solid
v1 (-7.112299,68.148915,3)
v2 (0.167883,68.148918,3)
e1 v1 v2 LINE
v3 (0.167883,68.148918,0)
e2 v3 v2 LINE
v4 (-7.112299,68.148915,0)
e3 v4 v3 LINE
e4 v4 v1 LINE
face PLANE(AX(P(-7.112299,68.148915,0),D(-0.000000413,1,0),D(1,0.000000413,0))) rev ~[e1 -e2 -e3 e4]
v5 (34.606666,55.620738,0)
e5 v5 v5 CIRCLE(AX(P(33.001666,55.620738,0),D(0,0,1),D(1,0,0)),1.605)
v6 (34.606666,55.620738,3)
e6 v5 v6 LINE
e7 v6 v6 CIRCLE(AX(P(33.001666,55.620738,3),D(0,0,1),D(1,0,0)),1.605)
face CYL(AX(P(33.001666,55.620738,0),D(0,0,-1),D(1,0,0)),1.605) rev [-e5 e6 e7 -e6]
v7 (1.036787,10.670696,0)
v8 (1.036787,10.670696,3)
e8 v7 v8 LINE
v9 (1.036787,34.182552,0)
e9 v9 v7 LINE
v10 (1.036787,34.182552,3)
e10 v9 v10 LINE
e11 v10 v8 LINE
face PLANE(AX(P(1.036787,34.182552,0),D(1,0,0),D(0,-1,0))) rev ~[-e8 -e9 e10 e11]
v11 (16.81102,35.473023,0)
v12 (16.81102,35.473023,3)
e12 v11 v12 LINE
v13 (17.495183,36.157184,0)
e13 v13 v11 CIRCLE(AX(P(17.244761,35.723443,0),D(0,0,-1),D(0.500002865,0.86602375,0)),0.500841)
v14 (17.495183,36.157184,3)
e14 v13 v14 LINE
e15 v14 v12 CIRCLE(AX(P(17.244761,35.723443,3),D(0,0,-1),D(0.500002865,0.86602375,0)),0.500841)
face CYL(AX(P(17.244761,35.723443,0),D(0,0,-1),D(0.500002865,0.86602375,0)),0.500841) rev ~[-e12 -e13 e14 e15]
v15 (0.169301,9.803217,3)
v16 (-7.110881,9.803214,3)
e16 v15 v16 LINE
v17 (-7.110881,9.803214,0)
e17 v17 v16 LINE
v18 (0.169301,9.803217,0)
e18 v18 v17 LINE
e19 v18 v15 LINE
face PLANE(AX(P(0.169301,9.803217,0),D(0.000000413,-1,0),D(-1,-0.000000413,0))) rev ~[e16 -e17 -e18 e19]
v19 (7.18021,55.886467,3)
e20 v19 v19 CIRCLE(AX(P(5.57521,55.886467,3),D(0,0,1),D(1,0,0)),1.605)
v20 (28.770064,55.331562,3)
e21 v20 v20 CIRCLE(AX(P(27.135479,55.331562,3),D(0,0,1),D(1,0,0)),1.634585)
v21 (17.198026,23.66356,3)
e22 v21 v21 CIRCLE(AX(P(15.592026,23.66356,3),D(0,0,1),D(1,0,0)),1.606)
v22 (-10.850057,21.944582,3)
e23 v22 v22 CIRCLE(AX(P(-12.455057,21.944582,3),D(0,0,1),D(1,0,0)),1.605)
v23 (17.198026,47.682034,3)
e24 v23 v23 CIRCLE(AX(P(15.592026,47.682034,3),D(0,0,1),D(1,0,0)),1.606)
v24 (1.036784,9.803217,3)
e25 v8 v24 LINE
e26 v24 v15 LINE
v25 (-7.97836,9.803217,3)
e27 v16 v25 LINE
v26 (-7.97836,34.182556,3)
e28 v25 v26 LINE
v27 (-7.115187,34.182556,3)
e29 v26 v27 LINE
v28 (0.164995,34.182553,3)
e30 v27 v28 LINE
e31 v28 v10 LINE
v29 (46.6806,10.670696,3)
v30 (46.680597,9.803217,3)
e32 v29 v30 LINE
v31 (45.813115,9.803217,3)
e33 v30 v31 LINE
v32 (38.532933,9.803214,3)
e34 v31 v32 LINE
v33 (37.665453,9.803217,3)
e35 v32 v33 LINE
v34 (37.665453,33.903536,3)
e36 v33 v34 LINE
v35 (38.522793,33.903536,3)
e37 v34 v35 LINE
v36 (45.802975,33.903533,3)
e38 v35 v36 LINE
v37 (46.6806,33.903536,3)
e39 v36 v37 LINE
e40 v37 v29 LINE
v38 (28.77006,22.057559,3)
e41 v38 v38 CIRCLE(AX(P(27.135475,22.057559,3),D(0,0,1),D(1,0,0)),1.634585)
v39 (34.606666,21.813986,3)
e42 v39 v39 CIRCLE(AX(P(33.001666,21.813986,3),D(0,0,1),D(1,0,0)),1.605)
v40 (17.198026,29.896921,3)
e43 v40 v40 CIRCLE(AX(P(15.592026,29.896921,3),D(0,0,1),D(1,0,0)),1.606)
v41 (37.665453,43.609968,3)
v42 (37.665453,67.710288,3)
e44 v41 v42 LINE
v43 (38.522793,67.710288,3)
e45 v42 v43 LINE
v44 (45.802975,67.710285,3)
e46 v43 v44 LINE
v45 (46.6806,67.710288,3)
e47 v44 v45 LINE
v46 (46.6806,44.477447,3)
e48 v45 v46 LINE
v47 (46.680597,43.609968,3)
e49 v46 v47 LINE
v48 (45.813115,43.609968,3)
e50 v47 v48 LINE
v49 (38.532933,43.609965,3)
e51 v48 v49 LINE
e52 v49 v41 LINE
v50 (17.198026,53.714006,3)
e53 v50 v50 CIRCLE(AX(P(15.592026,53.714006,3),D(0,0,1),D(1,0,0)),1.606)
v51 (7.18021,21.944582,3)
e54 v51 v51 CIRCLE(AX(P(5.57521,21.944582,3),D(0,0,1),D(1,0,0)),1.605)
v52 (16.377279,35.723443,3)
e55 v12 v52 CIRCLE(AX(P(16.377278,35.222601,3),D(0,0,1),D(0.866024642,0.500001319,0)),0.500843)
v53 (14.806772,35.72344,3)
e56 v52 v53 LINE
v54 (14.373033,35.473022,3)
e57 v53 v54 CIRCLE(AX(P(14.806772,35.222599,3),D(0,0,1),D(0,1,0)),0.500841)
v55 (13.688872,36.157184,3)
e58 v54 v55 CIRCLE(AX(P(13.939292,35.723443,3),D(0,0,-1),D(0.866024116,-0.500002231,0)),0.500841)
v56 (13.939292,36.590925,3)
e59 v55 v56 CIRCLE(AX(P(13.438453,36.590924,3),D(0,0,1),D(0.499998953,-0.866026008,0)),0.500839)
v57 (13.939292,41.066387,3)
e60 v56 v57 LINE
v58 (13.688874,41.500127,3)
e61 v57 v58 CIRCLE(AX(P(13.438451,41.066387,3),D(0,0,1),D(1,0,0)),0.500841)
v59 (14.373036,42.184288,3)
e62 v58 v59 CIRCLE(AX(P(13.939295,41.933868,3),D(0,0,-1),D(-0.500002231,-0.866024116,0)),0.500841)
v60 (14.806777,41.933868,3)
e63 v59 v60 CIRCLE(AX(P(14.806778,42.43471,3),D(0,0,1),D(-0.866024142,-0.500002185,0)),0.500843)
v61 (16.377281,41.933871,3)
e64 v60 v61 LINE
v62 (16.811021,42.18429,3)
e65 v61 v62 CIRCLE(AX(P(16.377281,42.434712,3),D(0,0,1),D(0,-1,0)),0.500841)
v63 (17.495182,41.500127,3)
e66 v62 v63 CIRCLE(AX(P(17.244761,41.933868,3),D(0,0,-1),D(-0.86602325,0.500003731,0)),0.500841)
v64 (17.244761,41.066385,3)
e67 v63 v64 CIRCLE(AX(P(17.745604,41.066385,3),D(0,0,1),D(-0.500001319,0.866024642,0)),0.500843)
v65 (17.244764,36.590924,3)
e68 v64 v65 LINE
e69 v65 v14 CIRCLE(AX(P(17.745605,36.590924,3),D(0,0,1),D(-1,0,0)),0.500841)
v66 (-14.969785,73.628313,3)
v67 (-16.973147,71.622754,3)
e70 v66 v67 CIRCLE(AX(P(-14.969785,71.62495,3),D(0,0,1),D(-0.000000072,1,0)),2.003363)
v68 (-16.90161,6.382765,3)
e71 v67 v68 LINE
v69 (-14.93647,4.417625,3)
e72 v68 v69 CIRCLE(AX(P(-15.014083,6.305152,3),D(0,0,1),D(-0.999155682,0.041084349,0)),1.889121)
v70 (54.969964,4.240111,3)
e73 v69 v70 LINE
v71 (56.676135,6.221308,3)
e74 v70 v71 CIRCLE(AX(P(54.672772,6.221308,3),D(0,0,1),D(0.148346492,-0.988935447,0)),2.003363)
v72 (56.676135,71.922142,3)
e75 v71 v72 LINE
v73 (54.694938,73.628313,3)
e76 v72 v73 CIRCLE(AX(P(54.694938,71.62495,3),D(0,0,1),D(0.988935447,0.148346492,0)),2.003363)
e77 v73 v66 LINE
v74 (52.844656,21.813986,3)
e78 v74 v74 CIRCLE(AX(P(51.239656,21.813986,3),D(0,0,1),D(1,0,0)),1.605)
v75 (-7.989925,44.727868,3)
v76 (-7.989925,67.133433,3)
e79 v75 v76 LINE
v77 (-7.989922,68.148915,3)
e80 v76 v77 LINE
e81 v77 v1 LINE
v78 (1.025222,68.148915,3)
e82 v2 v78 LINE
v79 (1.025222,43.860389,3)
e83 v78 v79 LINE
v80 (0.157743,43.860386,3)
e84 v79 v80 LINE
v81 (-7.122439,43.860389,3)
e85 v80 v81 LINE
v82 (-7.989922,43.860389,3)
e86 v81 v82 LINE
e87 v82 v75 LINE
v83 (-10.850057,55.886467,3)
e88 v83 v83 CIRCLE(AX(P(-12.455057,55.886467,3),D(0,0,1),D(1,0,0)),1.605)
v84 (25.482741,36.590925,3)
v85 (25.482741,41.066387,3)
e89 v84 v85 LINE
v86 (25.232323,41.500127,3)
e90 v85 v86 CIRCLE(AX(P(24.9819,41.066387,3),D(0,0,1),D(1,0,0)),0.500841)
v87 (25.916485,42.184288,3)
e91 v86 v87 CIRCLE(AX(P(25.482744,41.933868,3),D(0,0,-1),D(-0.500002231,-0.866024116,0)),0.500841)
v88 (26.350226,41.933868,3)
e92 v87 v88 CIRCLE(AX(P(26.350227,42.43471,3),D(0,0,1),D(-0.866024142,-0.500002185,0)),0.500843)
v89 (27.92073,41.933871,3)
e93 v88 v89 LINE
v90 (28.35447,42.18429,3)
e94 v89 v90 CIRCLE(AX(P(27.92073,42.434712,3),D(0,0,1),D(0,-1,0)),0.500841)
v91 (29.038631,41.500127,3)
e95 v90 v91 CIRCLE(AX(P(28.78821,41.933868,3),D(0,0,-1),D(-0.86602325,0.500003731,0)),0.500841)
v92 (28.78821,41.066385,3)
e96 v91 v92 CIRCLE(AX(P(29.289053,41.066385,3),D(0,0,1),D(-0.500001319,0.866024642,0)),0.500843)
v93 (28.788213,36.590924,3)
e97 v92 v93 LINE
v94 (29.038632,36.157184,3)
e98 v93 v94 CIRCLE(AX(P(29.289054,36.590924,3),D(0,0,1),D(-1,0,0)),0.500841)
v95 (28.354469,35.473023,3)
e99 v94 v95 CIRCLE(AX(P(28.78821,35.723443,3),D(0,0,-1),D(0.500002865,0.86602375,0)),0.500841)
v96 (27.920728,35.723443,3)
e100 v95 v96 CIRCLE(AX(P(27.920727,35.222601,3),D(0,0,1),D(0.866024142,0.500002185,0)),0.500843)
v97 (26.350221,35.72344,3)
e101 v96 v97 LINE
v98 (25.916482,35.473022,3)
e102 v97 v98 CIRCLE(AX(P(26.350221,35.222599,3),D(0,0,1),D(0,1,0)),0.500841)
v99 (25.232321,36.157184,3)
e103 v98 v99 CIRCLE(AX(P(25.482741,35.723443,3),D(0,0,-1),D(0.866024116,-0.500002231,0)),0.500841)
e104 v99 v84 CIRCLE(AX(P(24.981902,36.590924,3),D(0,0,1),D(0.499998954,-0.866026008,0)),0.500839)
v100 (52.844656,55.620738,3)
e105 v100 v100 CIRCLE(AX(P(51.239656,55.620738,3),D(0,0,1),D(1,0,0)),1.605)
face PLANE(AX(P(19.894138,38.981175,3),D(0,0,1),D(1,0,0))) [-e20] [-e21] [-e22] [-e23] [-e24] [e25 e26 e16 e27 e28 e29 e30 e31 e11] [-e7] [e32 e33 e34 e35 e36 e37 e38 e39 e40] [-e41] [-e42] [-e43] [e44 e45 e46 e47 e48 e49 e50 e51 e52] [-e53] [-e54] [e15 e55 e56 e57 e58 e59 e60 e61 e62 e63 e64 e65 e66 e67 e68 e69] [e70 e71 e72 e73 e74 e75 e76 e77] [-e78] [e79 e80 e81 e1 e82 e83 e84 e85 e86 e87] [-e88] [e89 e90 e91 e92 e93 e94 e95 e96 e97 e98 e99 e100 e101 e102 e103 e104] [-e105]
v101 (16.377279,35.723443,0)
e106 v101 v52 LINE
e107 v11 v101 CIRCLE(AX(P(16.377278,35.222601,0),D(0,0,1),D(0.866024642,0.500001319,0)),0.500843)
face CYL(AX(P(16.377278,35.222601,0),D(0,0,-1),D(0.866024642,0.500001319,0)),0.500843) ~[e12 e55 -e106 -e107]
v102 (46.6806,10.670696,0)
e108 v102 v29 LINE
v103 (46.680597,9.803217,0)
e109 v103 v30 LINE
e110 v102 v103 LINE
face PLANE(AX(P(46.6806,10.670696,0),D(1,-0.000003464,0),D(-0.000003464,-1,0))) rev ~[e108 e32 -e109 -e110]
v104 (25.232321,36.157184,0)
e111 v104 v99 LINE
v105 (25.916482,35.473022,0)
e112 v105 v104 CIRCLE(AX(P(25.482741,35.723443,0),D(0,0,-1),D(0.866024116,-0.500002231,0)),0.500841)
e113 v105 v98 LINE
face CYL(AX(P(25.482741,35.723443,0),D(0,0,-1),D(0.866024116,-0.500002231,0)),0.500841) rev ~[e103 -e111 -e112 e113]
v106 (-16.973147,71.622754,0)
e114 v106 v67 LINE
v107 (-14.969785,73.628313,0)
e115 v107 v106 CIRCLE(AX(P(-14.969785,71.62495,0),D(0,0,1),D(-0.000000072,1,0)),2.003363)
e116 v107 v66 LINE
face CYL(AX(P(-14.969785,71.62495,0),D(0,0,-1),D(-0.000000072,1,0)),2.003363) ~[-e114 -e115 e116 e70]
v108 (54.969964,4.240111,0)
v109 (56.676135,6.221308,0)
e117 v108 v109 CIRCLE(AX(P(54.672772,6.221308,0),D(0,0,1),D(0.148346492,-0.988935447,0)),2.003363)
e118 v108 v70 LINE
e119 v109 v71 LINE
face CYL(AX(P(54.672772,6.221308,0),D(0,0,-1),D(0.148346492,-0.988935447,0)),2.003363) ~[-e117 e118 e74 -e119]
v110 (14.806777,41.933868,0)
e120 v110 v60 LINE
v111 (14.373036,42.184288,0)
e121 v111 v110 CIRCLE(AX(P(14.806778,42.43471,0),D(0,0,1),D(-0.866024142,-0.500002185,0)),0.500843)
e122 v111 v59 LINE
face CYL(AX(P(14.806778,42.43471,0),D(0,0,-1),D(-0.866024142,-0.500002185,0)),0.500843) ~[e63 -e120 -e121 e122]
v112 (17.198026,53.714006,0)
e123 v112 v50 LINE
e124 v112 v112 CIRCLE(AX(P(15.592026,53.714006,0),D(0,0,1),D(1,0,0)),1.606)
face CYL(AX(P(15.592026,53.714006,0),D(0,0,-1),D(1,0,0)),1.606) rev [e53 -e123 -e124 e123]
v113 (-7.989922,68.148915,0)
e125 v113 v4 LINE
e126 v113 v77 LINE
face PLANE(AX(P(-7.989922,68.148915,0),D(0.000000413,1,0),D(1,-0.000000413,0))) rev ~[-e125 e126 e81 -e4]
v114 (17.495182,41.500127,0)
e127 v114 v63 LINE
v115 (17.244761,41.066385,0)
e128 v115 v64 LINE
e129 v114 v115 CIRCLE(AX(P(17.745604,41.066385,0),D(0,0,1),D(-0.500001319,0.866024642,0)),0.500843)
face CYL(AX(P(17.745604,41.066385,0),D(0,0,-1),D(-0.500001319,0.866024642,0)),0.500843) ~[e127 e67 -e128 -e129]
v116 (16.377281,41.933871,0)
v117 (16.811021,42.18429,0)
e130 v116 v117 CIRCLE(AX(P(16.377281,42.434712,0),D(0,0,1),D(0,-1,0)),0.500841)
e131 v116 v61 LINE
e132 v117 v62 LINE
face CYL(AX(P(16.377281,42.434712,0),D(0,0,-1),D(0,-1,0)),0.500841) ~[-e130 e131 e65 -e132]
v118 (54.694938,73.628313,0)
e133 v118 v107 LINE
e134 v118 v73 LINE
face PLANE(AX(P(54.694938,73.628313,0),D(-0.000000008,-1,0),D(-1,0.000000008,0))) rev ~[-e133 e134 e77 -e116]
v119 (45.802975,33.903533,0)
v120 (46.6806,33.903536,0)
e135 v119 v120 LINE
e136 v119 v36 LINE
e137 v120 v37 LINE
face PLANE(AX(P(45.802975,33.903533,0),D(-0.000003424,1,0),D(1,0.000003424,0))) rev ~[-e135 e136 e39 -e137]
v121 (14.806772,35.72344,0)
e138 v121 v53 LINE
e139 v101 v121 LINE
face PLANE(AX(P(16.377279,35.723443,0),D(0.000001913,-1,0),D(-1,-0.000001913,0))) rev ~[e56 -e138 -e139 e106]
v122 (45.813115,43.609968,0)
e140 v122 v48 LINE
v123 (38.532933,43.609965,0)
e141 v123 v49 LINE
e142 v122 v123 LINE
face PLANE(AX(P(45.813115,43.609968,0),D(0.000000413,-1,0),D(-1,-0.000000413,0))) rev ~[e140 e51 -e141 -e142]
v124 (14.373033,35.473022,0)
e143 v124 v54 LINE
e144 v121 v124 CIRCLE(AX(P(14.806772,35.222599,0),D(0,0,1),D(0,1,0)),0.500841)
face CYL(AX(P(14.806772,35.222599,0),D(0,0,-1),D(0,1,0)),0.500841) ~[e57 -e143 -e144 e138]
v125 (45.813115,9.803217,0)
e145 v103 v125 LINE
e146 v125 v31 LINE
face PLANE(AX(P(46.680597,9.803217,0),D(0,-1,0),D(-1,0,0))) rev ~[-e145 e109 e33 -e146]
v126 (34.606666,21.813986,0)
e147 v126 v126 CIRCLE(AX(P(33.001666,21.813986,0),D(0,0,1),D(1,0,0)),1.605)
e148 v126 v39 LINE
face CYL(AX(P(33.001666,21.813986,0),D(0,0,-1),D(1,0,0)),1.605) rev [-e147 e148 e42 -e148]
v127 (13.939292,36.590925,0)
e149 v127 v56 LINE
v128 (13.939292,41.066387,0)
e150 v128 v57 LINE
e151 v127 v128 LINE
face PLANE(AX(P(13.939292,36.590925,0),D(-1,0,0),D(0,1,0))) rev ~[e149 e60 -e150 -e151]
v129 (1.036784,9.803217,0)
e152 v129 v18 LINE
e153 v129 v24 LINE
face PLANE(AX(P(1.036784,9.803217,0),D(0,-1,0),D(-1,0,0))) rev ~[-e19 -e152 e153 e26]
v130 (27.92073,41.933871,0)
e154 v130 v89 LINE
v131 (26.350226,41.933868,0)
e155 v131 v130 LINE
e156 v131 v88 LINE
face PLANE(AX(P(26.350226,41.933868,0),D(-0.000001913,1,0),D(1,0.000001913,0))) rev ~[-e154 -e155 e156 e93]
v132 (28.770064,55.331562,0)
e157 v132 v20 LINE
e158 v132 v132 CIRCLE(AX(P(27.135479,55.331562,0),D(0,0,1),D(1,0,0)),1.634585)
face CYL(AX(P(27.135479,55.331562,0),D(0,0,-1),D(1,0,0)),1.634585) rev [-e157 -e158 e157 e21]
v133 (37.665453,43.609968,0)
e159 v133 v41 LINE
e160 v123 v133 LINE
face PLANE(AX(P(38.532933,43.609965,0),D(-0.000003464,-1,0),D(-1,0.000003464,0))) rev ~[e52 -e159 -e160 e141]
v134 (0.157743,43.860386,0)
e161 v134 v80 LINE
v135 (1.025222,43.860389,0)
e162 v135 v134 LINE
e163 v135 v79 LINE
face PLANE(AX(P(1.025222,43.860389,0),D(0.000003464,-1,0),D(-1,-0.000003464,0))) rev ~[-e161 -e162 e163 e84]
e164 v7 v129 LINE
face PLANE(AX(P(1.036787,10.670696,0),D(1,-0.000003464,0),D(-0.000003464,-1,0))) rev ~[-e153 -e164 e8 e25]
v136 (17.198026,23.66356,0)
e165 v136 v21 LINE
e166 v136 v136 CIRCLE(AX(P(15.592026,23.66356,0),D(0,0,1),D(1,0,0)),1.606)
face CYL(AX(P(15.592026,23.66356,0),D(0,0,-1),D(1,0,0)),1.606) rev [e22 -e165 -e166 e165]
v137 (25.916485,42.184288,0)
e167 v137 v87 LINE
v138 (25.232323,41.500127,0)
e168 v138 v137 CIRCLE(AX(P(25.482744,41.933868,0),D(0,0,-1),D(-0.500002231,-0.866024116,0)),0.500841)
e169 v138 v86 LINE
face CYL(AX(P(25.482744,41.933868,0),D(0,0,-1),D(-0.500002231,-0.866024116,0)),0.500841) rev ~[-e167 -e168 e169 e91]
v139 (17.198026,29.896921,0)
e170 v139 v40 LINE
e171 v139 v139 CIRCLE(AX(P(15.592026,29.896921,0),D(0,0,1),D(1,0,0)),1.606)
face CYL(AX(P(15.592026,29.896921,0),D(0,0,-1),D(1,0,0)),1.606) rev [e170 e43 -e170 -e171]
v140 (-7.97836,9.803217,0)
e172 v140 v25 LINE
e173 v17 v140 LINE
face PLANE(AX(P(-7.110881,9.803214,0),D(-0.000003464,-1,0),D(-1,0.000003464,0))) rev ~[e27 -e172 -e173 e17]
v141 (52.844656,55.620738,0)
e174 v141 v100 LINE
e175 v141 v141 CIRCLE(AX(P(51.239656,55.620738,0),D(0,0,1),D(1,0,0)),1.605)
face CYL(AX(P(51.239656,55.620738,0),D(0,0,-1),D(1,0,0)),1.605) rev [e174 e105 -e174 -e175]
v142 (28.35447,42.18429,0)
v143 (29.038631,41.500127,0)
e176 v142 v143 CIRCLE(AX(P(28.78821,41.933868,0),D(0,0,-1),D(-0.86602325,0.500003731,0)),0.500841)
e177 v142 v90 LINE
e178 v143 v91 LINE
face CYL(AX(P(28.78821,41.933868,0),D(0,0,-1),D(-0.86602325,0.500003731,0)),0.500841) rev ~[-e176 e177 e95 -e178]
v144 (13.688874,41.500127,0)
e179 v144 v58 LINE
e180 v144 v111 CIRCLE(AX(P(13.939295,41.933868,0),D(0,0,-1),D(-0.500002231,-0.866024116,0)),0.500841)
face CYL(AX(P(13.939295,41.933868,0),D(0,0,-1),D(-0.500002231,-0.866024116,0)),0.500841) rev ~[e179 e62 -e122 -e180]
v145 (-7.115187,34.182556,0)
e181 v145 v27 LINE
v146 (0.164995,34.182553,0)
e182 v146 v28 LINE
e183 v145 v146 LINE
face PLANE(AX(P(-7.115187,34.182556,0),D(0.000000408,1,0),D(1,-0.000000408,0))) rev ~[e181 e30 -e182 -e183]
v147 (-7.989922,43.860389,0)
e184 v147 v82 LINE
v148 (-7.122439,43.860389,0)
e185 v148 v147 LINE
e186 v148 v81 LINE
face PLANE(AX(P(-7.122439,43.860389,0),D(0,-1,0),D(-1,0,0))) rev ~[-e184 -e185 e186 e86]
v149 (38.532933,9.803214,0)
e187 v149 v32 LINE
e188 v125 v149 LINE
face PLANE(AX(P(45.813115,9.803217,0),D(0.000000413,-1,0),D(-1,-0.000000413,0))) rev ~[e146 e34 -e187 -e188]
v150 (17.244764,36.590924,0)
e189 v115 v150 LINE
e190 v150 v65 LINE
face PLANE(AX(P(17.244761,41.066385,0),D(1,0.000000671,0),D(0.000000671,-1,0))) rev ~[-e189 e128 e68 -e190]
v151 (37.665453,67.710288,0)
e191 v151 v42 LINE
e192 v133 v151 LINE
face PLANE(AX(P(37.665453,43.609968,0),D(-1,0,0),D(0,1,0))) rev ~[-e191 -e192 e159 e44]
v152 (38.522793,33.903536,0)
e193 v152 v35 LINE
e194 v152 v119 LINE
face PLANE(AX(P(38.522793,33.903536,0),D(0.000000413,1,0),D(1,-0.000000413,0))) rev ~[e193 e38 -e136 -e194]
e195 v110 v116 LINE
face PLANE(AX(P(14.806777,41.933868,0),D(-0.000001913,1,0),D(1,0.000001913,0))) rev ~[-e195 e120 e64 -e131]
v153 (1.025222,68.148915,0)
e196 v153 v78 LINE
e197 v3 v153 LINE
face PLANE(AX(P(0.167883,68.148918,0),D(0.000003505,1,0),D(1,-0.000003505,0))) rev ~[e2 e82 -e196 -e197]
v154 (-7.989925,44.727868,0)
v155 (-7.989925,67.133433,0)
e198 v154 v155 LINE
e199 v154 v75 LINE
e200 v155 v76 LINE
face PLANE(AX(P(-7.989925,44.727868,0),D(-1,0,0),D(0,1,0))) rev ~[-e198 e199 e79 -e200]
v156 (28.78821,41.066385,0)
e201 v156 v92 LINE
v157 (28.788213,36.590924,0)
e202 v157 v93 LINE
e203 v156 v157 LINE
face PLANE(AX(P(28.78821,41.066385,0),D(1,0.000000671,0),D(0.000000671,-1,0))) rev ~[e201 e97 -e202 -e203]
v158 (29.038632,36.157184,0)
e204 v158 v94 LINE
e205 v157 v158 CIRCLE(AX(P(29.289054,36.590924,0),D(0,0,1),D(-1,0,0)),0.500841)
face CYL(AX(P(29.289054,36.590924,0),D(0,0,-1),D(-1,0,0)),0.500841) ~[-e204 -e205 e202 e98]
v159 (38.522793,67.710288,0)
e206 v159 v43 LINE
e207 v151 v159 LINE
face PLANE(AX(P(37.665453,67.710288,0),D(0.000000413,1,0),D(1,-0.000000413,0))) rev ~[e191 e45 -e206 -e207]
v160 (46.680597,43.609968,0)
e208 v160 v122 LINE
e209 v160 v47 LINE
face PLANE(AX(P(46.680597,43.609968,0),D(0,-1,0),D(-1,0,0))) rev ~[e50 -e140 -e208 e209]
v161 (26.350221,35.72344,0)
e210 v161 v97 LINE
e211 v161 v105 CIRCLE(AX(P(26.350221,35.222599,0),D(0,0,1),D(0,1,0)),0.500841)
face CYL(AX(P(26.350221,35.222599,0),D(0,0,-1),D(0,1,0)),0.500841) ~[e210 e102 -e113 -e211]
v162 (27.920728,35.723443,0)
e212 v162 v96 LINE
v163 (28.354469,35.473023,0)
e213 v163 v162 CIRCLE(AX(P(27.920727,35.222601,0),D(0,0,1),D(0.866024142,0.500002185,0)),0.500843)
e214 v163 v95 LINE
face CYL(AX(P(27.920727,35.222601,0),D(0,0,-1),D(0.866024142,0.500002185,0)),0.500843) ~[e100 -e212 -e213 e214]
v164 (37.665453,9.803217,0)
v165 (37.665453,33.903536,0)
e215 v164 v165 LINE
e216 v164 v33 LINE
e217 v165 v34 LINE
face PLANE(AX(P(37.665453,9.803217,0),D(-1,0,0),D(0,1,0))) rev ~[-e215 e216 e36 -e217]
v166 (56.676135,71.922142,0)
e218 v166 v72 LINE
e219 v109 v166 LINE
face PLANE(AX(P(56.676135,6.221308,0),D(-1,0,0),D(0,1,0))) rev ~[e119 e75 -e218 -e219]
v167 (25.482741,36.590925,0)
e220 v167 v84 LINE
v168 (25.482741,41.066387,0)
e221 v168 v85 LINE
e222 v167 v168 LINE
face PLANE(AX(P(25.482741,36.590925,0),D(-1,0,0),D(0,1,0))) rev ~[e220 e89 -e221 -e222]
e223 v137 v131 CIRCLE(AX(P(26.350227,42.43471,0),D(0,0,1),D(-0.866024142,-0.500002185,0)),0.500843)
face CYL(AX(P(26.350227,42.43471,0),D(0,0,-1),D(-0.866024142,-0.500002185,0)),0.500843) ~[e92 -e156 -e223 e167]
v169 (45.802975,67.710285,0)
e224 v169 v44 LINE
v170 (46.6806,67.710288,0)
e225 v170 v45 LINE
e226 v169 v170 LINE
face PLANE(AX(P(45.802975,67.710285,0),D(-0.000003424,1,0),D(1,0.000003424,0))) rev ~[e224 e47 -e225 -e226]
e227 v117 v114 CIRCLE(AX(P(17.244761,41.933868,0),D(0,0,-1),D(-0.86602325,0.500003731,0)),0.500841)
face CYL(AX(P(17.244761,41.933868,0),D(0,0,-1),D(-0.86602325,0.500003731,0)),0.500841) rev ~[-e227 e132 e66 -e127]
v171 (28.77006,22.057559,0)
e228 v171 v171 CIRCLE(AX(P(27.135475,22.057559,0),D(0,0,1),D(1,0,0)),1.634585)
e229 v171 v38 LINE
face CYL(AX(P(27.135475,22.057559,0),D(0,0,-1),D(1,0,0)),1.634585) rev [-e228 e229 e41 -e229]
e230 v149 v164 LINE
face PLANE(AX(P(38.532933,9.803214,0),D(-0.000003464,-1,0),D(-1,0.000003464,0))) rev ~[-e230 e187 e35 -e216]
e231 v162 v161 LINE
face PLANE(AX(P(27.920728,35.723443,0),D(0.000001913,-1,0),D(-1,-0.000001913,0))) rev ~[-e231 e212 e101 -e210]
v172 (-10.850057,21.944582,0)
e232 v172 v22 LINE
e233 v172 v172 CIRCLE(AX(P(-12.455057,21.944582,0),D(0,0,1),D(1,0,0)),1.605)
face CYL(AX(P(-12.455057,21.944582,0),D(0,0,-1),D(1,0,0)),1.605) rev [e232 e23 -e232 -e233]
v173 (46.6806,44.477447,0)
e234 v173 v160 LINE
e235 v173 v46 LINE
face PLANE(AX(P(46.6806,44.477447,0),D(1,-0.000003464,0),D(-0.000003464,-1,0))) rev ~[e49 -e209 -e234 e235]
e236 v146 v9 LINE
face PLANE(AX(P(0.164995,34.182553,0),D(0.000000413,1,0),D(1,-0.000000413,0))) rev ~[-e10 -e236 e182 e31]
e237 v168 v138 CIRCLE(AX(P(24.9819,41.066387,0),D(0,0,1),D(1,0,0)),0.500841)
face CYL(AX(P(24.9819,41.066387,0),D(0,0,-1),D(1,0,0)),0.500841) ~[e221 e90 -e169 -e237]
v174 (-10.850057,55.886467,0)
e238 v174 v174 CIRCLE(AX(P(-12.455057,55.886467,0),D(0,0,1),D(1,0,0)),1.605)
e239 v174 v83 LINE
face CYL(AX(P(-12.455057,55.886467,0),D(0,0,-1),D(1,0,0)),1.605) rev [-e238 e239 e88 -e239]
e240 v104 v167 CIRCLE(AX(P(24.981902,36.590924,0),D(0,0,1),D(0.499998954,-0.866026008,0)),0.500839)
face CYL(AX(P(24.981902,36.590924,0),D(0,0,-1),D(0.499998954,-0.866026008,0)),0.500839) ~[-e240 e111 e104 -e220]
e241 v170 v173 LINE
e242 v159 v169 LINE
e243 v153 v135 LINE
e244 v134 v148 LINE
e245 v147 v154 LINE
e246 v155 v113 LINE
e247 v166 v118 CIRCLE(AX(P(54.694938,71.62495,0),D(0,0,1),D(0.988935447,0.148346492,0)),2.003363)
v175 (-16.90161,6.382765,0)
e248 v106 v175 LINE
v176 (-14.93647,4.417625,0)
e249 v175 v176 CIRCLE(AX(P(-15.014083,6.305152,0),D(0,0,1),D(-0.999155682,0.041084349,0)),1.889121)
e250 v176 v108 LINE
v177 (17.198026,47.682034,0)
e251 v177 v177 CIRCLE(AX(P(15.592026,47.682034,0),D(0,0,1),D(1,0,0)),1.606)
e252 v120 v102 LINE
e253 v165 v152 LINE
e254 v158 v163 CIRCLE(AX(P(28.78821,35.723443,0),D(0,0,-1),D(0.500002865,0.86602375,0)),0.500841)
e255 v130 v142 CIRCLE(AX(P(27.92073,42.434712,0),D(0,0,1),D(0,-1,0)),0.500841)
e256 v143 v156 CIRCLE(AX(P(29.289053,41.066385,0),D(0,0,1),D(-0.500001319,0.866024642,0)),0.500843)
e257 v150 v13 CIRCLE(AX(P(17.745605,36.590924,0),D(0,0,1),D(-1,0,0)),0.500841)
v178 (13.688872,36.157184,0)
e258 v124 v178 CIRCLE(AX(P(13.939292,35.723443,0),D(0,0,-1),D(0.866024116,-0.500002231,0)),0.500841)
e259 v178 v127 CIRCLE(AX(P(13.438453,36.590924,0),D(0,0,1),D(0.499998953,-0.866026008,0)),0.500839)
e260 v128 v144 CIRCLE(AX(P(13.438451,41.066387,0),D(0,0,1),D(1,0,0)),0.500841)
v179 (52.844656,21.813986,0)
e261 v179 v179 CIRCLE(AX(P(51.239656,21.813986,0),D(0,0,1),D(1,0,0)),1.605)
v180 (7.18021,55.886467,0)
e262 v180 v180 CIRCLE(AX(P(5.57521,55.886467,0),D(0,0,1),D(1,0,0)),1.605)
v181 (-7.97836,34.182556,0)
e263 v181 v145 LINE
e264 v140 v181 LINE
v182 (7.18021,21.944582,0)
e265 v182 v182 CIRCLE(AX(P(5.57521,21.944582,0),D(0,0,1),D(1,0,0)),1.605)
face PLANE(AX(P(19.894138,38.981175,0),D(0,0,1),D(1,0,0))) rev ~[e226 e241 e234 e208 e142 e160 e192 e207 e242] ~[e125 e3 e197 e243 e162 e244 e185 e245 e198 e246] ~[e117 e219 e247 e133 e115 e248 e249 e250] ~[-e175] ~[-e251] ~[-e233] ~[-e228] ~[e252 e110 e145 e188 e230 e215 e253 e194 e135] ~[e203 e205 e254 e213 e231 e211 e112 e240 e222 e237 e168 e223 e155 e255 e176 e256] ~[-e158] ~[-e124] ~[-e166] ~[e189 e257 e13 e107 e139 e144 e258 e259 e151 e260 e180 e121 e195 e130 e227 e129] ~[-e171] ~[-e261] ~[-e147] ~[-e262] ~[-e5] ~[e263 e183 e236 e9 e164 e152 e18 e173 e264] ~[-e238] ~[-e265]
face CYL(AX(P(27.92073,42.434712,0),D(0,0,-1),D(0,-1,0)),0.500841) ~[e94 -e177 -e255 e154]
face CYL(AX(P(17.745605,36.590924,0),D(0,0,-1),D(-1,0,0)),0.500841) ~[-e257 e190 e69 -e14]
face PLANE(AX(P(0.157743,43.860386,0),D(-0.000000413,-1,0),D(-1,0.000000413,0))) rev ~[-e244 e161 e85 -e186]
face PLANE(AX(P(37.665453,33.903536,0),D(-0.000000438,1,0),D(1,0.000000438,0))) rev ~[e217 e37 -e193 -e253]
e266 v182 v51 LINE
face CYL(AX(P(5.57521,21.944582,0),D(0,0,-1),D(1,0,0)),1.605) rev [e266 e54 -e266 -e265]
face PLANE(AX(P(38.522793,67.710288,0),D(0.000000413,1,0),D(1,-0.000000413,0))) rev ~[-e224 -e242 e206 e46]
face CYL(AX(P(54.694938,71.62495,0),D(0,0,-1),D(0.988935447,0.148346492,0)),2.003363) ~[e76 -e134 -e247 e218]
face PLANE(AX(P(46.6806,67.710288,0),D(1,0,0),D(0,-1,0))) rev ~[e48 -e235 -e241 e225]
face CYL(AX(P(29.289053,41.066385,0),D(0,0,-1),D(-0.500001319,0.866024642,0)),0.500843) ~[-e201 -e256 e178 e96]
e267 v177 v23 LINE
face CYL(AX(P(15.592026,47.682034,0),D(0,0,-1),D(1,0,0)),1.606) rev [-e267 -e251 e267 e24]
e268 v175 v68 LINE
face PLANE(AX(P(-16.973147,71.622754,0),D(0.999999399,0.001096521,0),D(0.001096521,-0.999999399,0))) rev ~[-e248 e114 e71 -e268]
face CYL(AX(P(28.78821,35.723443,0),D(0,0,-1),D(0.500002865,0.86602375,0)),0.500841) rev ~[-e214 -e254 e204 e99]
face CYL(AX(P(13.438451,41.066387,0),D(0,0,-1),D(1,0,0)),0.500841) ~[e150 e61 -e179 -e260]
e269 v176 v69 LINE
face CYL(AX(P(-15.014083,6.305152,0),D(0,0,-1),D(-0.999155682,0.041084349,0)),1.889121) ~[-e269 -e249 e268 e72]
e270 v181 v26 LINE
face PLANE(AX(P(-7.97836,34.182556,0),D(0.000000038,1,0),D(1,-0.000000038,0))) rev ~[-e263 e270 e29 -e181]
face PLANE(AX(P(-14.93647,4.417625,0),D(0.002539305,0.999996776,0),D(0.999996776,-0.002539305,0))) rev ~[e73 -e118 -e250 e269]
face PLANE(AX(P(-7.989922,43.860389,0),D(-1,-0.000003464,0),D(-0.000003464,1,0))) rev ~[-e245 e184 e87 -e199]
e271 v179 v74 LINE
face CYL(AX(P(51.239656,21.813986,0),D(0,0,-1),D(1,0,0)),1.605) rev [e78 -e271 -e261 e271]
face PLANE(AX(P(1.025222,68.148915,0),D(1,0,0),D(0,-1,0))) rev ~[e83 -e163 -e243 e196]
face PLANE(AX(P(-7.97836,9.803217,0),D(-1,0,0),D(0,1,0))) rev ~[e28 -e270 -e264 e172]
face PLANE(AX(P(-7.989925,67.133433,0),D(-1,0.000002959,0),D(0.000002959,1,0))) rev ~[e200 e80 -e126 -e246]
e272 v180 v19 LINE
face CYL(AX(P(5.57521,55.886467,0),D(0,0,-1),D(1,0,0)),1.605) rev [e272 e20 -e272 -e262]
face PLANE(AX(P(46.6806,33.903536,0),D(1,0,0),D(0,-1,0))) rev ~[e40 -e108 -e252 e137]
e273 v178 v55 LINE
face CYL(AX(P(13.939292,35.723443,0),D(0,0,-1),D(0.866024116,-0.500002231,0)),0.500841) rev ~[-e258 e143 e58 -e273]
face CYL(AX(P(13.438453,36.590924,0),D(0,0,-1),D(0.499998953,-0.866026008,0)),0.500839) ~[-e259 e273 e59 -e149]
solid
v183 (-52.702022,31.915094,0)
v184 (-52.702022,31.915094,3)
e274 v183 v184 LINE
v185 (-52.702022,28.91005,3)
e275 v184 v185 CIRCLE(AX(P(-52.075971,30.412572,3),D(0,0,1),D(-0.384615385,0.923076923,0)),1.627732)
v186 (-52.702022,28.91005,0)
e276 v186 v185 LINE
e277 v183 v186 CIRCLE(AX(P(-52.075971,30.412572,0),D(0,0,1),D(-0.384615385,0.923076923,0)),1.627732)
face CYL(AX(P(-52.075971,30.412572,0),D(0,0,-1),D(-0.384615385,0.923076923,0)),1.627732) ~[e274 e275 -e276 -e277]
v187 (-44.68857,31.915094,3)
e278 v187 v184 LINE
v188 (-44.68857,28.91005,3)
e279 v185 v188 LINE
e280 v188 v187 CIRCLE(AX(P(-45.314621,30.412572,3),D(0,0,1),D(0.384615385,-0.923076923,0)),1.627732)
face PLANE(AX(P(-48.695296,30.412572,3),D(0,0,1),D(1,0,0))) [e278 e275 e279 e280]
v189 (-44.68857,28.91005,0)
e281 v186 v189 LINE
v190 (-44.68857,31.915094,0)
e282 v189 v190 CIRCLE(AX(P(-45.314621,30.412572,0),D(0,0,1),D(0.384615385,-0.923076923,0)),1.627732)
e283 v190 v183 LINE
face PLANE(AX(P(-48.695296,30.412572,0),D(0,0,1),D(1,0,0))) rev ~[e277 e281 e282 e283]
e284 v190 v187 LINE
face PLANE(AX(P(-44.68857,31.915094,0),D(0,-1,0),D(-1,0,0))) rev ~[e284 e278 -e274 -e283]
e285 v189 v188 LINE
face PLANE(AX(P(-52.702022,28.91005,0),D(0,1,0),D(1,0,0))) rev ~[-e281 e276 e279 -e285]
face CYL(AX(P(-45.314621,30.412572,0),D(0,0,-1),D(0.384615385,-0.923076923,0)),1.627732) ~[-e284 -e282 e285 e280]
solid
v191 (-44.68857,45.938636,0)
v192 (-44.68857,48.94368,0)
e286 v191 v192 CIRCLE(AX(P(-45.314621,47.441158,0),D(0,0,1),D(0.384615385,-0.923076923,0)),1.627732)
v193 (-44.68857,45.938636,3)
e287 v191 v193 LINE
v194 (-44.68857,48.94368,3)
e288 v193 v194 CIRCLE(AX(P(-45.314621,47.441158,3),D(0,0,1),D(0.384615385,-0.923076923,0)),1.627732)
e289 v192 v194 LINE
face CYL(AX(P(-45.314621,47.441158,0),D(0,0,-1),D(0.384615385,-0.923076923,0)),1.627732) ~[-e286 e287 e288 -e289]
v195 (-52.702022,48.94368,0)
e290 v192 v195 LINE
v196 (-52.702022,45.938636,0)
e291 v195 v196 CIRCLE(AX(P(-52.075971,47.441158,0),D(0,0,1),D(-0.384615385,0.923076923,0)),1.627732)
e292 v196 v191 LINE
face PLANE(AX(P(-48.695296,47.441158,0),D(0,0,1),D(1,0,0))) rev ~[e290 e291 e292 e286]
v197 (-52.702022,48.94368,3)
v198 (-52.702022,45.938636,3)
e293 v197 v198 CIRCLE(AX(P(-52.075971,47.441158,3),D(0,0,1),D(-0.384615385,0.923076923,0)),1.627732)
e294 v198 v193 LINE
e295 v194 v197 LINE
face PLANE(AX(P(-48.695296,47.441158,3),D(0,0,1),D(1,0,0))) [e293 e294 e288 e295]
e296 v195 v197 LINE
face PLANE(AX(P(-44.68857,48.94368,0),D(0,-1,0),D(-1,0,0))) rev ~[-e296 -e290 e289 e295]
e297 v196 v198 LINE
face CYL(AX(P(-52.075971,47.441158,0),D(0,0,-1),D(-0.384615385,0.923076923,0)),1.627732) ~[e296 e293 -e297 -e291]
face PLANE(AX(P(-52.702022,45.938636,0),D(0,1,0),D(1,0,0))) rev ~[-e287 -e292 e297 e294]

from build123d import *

# Parameters (mm, degrees)
F0_R     = 1.605
F0_R_2   = 1.606
F0_R_3   = 1.6345849858
F1_DEPTH = 3


# Not quite as in the source:
# - ends of sketch curves that miss each other by under 0.0002 mm in the source are joined


with BuildPart() as f1:
    # F0 (on Top) → F1 (new body)
    with BuildSketch(Plane.XY):
        with BuildLine():
            Line((-16.9731467252, 71.6227536132), (-16.9016096355, 6.3827649274))
            ThreePointArc((-16.9016096355, 6.3827649274), (-16.3498938581, 4.9693411595), (-14.9364701023, 4.4176253513))
            Line((-14.9364701023, 4.4176253513), (54.9699635075, 4.2401110439))
            ThreePointArc((54.9699635075, 4.2401110439), (56.1908043606, 4.9140051596), (56.6761346812, 6.2213077824))
            Line((56.6761346812, 6.2213077824), (56.6761346812, 71.9221415992))
            ThreePointArc((56.6761346812, 71.9221415992), (56.0022405655, 73.1429824523), (54.6949379427, 73.6283127729))
            Line((54.6949379427, 73.6283127729), (-14.9697846716, 73.6283133561))
            ThreePointArc((-14.9697846716, 73.6283133561), (-16.3871527066, 73.0407650431), (-16.9731467252, 71.6227536132))
        make_face()
        with Locations((-12.4550571863, 21.9445816246)):
            Circle(F0_R, mode=Mode.SUBTRACT)
        Polygon((-7.9783601332, 34.1825555709), (-7.115187118, 34.1825555379), (0.1649951569, 34.1825525659), (1.0367866374, 34.182552206), (1.0367866374, 33.0762614296), (1.0367866374, 10.6706960983), (1.0367836324, 9.8032168566), (0.1693013857, 9.8032168566), (-7.1108808916, 9.8032138516), (-7.9783601332, 9.8032168566), (-7.9783601332, 10.6706981016), (-7.9783601332, 33.0762594262), align=None, mode=Mode.SUBTRACT)
        with Locations((5.5752103113, 21.9445816246)):
            Circle(F0_R, mode=Mode.SUBTRACT)
        with Locations((15.5920255878, 23.6635602825)):
            Circle(F0_R_2, mode=Mode.SUBTRACT)
        with Locations((27.1354746317, 22.0575592808)):
            Circle(F0_R_3, mode=Mode.SUBTRACT)
        with Locations((15.5920255878, 29.8969212558)):
            Circle(F0_R_2, mode=Mode.SUBTRACT)
        with BuildLine():
            Line((13.9392921361, 36.5909245116), (13.9392921361, 41.066387493))
            ThreePointArc((13.9392921361, 41.066387493), (13.8721927186, 41.3168069715), (13.6888735611, 41.5001272745))
            ThreePointArc((13.6888735611, 41.5001272745), (13.5851479016, 42.2880162976), (14.3730360405, 42.1842879889))
            ThreePointArc((14.3730360405, 42.1842879889), (14.5563571581, 42.0009675875), (14.8067773878, 41.9338677363))
            Line((14.8067773878, 41.9338677363), (16.3772807995, 41.9338707414))
            ThreePointArc((16.3772807995, 41.9338707414), (16.6277006536, 42.0009703757), (16.8110210147, 42.1842900676))
            ThreePointArc((16.8110210147, 42.1842900676), (17.5989095566, 42.2880150233), (17.4951817292, 41.5001270874))
            ThreePointArc((17.4951817292, 41.5001270874), (17.3118610192, 41.3168059362), (17.2447610428, 41.0663854897))
            Line((17.2447610428, 41.0663854897), (17.2447640478, 36.5909235099))
            ThreePointArc((17.2447640478, 36.5909235099), (17.311863557, 36.3405038727), (17.4951829403, 36.1571835451))
            ThreePointArc((17.4951829403, 36.1571835451), (17.5989083298, 35.3692947528), (16.8110203938, 35.4730225802))
            ThreePointArc((16.8110203938, 35.4730225802), (16.6276992427, 35.6563432902), (16.3772787961, 35.7234432666))
            Line((16.3772787961, 35.7234432666), (14.8067723794, 35.7234402616))
            ThreePointArc((14.8067723794, 35.7234402616), (14.556352901, 35.6563408441), (14.3730325979, 35.4730216866))
            ThreePointArc((14.3730325979, 35.4730216866), (13.5851437519, 35.36929585), (13.6888718835, 36.157184166))
            ThreePointArc((13.6888718835, 36.157184166), (13.8721922849, 36.3405042819), (13.9392921361, 36.5909245116))
        make_face(mode=Mode.SUBTRACT)
        with BuildLine():
            Line((25.4827411801, 36.5909245116), (25.4827411801, 41.066387493))
            ThreePointArc((25.4827411801, 41.066387493), (25.4156417626, 41.3168069715), (25.2323226051, 41.5001272745))
            ThreePointArc((25.2323226051, 41.5001272745), (25.1285969456, 42.2880162976), (25.9164850845, 42.1842879889))
            ThreePointArc((25.9164850845, 42.1842879889), (26.0998059852, 42.0009677127), (26.3502264318, 41.9338677363))
            Line((26.3502264318, 41.9338677363), (27.9207298435, 41.9338707414))
            ThreePointArc((27.9207298435, 41.9338707414), (28.1711496975, 42.0009703757), (28.3544700587, 42.1842900676))
            ThreePointArc((28.3544700587, 42.1842900676), (29.1423586006, 42.2880150233), (29.0386307731, 41.5001270874))
            ThreePointArc((29.0386307731, 41.5001270874), (28.8553100632, 41.3168059362), (28.7882100868, 41.0663854897))
            Line((28.7882100868, 41.0663854897), (28.7882130918, 36.5909235099))
            ThreePointArc((28.7882130918, 36.5909235099), (28.855312601, 36.3405038727), (29.0386319843, 36.1571835451))
            ThreePointArc((29.0386319843, 36.1571835451), (29.1423571967, 35.3692945757), (28.3544691874, 35.473023014))
            ThreePointArc((28.3544691874, 35.473023014), (28.1711482867, 35.6563432902), (27.9207278401, 35.7234432666))
            Line((27.9207278401, 35.7234432666), (26.3502214234, 35.7234402616))
            ThreePointArc((26.3502214234, 35.7234402616), (26.0998019449, 35.6563408441), (25.9164816419, 35.4730216866))
            ThreePointArc((25.9164816419, 35.4730216866), (25.1285927959, 35.36929585), (25.2323209275, 36.157184166))
            ThreePointArc((25.2323209275, 36.157184166), (25.4156413288, 36.3405042819), (25.4827411801, 36.5909245116))
        make_face(mode=Mode.SUBTRACT)
        with Locations((33.0016662521, 21.8139863938)):
            Circle(F0_R, mode=Mode.SUBTRACT)
        Polygon((37.6654533742, 33.9035358044), (38.5227925937, 33.9035361797), (45.8029748711, 33.9035331747), (46.6806001449, 33.9035361797), (46.6806001449, 33.0762614296), (46.6806001449, 10.6706960983), (46.6805971399, 9.8032168566), (45.8131148932, 9.8032168566), (38.5329326158, 9.8032138516), (37.6654533742, 9.8032168566), (37.6654533742, 10.6706981016), (37.6654533742, 33.0762594262), align=None, mode=Mode.SUBTRACT)
        with Locations((51.2396564549, 21.8139863938)):
            Circle(F0_R, mode=Mode.SUBTRACT)
        with Locations((-12.4550571863, 55.8864670325)):
            Circle(F0_R, mode=Mode.SUBTRACT)
        Polygon((-7.1122992726, 68.1489150636), (0.1678830047, 68.1489180686), (1.0252222242, 68.1489150636), (1.0252222242, 67.1334313662), (1.0252222242, 44.7278700416), (1.0252222242, 43.8603887966), (0.1577429826, 43.8603857915), (-7.1224392948, 43.8603887966), (-7.9899215414, 43.8603887966), (-7.9899245465, 44.7278680382), (-7.9899245465, 67.1334333695), (-7.9899215414, 68.1489154258), align=None, mode=Mode.SUBTRACT)
        with Locations((5.5752103113, 55.8864670325)):
            Circle(F0_R, mode=Mode.SUBTRACT)
        with Locations((15.5920255878, 47.6820342113)):
            Circle(F0_R_2, mode=Mode.SUBTRACT)
        with Locations((15.5920255878, 53.7140061118)):
            Circle(F0_R_2, mode=Mode.SUBTRACT)
        with Locations((27.1354786385, 55.3315615099)):
            Circle(F0_R_3, mode=Mode.SUBTRACT)
        with Locations((33.0016662521, 55.6207377599)):
            Circle(F0_R, mode=Mode.SUBTRACT)
        Polygon((37.6654533742, 67.7102878997), (38.5227925937, 67.7102875459), (45.8029748711, 67.7102845408), (46.6806001449, 67.7102875459), (46.6806001449, 66.8830127957), (46.6806001449, 44.4774474644), (46.6805971399, 43.6099682228), (45.8131148932, 43.6099682228), (38.5329326158, 43.6099652177), (37.6654533742, 43.6099682228), (37.6654533742, 44.4774494677), (37.6654533742, 66.8830107923), align=None, mode=Mode.SUBTRACT)
        with Locations((51.2396564549, 55.6207377599)):
            Circle(F0_R, mode=Mode.SUBTRACT)
    extrude(amount=F1_DEPTH)


with BuildPart() as f1b:
    # F0 (on Top) → F1, piece 2 (new body)
    with BuildSketch(Plane.XY):
        with BuildLine():
            ThreePointArc((-44.6885697404, 45.9386355595), (-43.6868882127, 47.441157851), (-44.6885697404, 48.9436801425))
            Line((-44.6885697404, 48.9436801425), (-52.7020219615, 48.9436801425))
            ThreePointArc((-52.7020219615, 48.9436801425), (-53.7037034892, 47.441157851), (-52.7020219615, 45.9386355595))
            Line((-52.7020219615, 45.9386355595), (-44.6885697404, 45.9386355595))
        make_face()
    extrude(amount=F1_DEPTH)


with BuildPart() as f1c:
    # F0 (on Top) → F1, piece 3 (new body)
    with BuildSketch(Plane.XY):
        with BuildLine():
            ThreePointArc((-44.6885697404, 28.9100495895), (-43.6868882127, 30.412571881), (-44.6885697404, 31.9150941725))
            Line((-44.6885697404, 31.9150941725), (-52.7020219615, 31.9150941725))
            ThreePointArc((-52.7020219615, 31.9150941725), (-53.7037034892, 30.412571881), (-52.7020219615, 28.9100495895))
            Line((-52.7020219615, 28.9100495895), (-44.6885697404, 28.9100495895))
        make_face()
    extrude(amount=F1_DEPTH)


solid = Compound([f1.part, f1b.part, f1c.part])
